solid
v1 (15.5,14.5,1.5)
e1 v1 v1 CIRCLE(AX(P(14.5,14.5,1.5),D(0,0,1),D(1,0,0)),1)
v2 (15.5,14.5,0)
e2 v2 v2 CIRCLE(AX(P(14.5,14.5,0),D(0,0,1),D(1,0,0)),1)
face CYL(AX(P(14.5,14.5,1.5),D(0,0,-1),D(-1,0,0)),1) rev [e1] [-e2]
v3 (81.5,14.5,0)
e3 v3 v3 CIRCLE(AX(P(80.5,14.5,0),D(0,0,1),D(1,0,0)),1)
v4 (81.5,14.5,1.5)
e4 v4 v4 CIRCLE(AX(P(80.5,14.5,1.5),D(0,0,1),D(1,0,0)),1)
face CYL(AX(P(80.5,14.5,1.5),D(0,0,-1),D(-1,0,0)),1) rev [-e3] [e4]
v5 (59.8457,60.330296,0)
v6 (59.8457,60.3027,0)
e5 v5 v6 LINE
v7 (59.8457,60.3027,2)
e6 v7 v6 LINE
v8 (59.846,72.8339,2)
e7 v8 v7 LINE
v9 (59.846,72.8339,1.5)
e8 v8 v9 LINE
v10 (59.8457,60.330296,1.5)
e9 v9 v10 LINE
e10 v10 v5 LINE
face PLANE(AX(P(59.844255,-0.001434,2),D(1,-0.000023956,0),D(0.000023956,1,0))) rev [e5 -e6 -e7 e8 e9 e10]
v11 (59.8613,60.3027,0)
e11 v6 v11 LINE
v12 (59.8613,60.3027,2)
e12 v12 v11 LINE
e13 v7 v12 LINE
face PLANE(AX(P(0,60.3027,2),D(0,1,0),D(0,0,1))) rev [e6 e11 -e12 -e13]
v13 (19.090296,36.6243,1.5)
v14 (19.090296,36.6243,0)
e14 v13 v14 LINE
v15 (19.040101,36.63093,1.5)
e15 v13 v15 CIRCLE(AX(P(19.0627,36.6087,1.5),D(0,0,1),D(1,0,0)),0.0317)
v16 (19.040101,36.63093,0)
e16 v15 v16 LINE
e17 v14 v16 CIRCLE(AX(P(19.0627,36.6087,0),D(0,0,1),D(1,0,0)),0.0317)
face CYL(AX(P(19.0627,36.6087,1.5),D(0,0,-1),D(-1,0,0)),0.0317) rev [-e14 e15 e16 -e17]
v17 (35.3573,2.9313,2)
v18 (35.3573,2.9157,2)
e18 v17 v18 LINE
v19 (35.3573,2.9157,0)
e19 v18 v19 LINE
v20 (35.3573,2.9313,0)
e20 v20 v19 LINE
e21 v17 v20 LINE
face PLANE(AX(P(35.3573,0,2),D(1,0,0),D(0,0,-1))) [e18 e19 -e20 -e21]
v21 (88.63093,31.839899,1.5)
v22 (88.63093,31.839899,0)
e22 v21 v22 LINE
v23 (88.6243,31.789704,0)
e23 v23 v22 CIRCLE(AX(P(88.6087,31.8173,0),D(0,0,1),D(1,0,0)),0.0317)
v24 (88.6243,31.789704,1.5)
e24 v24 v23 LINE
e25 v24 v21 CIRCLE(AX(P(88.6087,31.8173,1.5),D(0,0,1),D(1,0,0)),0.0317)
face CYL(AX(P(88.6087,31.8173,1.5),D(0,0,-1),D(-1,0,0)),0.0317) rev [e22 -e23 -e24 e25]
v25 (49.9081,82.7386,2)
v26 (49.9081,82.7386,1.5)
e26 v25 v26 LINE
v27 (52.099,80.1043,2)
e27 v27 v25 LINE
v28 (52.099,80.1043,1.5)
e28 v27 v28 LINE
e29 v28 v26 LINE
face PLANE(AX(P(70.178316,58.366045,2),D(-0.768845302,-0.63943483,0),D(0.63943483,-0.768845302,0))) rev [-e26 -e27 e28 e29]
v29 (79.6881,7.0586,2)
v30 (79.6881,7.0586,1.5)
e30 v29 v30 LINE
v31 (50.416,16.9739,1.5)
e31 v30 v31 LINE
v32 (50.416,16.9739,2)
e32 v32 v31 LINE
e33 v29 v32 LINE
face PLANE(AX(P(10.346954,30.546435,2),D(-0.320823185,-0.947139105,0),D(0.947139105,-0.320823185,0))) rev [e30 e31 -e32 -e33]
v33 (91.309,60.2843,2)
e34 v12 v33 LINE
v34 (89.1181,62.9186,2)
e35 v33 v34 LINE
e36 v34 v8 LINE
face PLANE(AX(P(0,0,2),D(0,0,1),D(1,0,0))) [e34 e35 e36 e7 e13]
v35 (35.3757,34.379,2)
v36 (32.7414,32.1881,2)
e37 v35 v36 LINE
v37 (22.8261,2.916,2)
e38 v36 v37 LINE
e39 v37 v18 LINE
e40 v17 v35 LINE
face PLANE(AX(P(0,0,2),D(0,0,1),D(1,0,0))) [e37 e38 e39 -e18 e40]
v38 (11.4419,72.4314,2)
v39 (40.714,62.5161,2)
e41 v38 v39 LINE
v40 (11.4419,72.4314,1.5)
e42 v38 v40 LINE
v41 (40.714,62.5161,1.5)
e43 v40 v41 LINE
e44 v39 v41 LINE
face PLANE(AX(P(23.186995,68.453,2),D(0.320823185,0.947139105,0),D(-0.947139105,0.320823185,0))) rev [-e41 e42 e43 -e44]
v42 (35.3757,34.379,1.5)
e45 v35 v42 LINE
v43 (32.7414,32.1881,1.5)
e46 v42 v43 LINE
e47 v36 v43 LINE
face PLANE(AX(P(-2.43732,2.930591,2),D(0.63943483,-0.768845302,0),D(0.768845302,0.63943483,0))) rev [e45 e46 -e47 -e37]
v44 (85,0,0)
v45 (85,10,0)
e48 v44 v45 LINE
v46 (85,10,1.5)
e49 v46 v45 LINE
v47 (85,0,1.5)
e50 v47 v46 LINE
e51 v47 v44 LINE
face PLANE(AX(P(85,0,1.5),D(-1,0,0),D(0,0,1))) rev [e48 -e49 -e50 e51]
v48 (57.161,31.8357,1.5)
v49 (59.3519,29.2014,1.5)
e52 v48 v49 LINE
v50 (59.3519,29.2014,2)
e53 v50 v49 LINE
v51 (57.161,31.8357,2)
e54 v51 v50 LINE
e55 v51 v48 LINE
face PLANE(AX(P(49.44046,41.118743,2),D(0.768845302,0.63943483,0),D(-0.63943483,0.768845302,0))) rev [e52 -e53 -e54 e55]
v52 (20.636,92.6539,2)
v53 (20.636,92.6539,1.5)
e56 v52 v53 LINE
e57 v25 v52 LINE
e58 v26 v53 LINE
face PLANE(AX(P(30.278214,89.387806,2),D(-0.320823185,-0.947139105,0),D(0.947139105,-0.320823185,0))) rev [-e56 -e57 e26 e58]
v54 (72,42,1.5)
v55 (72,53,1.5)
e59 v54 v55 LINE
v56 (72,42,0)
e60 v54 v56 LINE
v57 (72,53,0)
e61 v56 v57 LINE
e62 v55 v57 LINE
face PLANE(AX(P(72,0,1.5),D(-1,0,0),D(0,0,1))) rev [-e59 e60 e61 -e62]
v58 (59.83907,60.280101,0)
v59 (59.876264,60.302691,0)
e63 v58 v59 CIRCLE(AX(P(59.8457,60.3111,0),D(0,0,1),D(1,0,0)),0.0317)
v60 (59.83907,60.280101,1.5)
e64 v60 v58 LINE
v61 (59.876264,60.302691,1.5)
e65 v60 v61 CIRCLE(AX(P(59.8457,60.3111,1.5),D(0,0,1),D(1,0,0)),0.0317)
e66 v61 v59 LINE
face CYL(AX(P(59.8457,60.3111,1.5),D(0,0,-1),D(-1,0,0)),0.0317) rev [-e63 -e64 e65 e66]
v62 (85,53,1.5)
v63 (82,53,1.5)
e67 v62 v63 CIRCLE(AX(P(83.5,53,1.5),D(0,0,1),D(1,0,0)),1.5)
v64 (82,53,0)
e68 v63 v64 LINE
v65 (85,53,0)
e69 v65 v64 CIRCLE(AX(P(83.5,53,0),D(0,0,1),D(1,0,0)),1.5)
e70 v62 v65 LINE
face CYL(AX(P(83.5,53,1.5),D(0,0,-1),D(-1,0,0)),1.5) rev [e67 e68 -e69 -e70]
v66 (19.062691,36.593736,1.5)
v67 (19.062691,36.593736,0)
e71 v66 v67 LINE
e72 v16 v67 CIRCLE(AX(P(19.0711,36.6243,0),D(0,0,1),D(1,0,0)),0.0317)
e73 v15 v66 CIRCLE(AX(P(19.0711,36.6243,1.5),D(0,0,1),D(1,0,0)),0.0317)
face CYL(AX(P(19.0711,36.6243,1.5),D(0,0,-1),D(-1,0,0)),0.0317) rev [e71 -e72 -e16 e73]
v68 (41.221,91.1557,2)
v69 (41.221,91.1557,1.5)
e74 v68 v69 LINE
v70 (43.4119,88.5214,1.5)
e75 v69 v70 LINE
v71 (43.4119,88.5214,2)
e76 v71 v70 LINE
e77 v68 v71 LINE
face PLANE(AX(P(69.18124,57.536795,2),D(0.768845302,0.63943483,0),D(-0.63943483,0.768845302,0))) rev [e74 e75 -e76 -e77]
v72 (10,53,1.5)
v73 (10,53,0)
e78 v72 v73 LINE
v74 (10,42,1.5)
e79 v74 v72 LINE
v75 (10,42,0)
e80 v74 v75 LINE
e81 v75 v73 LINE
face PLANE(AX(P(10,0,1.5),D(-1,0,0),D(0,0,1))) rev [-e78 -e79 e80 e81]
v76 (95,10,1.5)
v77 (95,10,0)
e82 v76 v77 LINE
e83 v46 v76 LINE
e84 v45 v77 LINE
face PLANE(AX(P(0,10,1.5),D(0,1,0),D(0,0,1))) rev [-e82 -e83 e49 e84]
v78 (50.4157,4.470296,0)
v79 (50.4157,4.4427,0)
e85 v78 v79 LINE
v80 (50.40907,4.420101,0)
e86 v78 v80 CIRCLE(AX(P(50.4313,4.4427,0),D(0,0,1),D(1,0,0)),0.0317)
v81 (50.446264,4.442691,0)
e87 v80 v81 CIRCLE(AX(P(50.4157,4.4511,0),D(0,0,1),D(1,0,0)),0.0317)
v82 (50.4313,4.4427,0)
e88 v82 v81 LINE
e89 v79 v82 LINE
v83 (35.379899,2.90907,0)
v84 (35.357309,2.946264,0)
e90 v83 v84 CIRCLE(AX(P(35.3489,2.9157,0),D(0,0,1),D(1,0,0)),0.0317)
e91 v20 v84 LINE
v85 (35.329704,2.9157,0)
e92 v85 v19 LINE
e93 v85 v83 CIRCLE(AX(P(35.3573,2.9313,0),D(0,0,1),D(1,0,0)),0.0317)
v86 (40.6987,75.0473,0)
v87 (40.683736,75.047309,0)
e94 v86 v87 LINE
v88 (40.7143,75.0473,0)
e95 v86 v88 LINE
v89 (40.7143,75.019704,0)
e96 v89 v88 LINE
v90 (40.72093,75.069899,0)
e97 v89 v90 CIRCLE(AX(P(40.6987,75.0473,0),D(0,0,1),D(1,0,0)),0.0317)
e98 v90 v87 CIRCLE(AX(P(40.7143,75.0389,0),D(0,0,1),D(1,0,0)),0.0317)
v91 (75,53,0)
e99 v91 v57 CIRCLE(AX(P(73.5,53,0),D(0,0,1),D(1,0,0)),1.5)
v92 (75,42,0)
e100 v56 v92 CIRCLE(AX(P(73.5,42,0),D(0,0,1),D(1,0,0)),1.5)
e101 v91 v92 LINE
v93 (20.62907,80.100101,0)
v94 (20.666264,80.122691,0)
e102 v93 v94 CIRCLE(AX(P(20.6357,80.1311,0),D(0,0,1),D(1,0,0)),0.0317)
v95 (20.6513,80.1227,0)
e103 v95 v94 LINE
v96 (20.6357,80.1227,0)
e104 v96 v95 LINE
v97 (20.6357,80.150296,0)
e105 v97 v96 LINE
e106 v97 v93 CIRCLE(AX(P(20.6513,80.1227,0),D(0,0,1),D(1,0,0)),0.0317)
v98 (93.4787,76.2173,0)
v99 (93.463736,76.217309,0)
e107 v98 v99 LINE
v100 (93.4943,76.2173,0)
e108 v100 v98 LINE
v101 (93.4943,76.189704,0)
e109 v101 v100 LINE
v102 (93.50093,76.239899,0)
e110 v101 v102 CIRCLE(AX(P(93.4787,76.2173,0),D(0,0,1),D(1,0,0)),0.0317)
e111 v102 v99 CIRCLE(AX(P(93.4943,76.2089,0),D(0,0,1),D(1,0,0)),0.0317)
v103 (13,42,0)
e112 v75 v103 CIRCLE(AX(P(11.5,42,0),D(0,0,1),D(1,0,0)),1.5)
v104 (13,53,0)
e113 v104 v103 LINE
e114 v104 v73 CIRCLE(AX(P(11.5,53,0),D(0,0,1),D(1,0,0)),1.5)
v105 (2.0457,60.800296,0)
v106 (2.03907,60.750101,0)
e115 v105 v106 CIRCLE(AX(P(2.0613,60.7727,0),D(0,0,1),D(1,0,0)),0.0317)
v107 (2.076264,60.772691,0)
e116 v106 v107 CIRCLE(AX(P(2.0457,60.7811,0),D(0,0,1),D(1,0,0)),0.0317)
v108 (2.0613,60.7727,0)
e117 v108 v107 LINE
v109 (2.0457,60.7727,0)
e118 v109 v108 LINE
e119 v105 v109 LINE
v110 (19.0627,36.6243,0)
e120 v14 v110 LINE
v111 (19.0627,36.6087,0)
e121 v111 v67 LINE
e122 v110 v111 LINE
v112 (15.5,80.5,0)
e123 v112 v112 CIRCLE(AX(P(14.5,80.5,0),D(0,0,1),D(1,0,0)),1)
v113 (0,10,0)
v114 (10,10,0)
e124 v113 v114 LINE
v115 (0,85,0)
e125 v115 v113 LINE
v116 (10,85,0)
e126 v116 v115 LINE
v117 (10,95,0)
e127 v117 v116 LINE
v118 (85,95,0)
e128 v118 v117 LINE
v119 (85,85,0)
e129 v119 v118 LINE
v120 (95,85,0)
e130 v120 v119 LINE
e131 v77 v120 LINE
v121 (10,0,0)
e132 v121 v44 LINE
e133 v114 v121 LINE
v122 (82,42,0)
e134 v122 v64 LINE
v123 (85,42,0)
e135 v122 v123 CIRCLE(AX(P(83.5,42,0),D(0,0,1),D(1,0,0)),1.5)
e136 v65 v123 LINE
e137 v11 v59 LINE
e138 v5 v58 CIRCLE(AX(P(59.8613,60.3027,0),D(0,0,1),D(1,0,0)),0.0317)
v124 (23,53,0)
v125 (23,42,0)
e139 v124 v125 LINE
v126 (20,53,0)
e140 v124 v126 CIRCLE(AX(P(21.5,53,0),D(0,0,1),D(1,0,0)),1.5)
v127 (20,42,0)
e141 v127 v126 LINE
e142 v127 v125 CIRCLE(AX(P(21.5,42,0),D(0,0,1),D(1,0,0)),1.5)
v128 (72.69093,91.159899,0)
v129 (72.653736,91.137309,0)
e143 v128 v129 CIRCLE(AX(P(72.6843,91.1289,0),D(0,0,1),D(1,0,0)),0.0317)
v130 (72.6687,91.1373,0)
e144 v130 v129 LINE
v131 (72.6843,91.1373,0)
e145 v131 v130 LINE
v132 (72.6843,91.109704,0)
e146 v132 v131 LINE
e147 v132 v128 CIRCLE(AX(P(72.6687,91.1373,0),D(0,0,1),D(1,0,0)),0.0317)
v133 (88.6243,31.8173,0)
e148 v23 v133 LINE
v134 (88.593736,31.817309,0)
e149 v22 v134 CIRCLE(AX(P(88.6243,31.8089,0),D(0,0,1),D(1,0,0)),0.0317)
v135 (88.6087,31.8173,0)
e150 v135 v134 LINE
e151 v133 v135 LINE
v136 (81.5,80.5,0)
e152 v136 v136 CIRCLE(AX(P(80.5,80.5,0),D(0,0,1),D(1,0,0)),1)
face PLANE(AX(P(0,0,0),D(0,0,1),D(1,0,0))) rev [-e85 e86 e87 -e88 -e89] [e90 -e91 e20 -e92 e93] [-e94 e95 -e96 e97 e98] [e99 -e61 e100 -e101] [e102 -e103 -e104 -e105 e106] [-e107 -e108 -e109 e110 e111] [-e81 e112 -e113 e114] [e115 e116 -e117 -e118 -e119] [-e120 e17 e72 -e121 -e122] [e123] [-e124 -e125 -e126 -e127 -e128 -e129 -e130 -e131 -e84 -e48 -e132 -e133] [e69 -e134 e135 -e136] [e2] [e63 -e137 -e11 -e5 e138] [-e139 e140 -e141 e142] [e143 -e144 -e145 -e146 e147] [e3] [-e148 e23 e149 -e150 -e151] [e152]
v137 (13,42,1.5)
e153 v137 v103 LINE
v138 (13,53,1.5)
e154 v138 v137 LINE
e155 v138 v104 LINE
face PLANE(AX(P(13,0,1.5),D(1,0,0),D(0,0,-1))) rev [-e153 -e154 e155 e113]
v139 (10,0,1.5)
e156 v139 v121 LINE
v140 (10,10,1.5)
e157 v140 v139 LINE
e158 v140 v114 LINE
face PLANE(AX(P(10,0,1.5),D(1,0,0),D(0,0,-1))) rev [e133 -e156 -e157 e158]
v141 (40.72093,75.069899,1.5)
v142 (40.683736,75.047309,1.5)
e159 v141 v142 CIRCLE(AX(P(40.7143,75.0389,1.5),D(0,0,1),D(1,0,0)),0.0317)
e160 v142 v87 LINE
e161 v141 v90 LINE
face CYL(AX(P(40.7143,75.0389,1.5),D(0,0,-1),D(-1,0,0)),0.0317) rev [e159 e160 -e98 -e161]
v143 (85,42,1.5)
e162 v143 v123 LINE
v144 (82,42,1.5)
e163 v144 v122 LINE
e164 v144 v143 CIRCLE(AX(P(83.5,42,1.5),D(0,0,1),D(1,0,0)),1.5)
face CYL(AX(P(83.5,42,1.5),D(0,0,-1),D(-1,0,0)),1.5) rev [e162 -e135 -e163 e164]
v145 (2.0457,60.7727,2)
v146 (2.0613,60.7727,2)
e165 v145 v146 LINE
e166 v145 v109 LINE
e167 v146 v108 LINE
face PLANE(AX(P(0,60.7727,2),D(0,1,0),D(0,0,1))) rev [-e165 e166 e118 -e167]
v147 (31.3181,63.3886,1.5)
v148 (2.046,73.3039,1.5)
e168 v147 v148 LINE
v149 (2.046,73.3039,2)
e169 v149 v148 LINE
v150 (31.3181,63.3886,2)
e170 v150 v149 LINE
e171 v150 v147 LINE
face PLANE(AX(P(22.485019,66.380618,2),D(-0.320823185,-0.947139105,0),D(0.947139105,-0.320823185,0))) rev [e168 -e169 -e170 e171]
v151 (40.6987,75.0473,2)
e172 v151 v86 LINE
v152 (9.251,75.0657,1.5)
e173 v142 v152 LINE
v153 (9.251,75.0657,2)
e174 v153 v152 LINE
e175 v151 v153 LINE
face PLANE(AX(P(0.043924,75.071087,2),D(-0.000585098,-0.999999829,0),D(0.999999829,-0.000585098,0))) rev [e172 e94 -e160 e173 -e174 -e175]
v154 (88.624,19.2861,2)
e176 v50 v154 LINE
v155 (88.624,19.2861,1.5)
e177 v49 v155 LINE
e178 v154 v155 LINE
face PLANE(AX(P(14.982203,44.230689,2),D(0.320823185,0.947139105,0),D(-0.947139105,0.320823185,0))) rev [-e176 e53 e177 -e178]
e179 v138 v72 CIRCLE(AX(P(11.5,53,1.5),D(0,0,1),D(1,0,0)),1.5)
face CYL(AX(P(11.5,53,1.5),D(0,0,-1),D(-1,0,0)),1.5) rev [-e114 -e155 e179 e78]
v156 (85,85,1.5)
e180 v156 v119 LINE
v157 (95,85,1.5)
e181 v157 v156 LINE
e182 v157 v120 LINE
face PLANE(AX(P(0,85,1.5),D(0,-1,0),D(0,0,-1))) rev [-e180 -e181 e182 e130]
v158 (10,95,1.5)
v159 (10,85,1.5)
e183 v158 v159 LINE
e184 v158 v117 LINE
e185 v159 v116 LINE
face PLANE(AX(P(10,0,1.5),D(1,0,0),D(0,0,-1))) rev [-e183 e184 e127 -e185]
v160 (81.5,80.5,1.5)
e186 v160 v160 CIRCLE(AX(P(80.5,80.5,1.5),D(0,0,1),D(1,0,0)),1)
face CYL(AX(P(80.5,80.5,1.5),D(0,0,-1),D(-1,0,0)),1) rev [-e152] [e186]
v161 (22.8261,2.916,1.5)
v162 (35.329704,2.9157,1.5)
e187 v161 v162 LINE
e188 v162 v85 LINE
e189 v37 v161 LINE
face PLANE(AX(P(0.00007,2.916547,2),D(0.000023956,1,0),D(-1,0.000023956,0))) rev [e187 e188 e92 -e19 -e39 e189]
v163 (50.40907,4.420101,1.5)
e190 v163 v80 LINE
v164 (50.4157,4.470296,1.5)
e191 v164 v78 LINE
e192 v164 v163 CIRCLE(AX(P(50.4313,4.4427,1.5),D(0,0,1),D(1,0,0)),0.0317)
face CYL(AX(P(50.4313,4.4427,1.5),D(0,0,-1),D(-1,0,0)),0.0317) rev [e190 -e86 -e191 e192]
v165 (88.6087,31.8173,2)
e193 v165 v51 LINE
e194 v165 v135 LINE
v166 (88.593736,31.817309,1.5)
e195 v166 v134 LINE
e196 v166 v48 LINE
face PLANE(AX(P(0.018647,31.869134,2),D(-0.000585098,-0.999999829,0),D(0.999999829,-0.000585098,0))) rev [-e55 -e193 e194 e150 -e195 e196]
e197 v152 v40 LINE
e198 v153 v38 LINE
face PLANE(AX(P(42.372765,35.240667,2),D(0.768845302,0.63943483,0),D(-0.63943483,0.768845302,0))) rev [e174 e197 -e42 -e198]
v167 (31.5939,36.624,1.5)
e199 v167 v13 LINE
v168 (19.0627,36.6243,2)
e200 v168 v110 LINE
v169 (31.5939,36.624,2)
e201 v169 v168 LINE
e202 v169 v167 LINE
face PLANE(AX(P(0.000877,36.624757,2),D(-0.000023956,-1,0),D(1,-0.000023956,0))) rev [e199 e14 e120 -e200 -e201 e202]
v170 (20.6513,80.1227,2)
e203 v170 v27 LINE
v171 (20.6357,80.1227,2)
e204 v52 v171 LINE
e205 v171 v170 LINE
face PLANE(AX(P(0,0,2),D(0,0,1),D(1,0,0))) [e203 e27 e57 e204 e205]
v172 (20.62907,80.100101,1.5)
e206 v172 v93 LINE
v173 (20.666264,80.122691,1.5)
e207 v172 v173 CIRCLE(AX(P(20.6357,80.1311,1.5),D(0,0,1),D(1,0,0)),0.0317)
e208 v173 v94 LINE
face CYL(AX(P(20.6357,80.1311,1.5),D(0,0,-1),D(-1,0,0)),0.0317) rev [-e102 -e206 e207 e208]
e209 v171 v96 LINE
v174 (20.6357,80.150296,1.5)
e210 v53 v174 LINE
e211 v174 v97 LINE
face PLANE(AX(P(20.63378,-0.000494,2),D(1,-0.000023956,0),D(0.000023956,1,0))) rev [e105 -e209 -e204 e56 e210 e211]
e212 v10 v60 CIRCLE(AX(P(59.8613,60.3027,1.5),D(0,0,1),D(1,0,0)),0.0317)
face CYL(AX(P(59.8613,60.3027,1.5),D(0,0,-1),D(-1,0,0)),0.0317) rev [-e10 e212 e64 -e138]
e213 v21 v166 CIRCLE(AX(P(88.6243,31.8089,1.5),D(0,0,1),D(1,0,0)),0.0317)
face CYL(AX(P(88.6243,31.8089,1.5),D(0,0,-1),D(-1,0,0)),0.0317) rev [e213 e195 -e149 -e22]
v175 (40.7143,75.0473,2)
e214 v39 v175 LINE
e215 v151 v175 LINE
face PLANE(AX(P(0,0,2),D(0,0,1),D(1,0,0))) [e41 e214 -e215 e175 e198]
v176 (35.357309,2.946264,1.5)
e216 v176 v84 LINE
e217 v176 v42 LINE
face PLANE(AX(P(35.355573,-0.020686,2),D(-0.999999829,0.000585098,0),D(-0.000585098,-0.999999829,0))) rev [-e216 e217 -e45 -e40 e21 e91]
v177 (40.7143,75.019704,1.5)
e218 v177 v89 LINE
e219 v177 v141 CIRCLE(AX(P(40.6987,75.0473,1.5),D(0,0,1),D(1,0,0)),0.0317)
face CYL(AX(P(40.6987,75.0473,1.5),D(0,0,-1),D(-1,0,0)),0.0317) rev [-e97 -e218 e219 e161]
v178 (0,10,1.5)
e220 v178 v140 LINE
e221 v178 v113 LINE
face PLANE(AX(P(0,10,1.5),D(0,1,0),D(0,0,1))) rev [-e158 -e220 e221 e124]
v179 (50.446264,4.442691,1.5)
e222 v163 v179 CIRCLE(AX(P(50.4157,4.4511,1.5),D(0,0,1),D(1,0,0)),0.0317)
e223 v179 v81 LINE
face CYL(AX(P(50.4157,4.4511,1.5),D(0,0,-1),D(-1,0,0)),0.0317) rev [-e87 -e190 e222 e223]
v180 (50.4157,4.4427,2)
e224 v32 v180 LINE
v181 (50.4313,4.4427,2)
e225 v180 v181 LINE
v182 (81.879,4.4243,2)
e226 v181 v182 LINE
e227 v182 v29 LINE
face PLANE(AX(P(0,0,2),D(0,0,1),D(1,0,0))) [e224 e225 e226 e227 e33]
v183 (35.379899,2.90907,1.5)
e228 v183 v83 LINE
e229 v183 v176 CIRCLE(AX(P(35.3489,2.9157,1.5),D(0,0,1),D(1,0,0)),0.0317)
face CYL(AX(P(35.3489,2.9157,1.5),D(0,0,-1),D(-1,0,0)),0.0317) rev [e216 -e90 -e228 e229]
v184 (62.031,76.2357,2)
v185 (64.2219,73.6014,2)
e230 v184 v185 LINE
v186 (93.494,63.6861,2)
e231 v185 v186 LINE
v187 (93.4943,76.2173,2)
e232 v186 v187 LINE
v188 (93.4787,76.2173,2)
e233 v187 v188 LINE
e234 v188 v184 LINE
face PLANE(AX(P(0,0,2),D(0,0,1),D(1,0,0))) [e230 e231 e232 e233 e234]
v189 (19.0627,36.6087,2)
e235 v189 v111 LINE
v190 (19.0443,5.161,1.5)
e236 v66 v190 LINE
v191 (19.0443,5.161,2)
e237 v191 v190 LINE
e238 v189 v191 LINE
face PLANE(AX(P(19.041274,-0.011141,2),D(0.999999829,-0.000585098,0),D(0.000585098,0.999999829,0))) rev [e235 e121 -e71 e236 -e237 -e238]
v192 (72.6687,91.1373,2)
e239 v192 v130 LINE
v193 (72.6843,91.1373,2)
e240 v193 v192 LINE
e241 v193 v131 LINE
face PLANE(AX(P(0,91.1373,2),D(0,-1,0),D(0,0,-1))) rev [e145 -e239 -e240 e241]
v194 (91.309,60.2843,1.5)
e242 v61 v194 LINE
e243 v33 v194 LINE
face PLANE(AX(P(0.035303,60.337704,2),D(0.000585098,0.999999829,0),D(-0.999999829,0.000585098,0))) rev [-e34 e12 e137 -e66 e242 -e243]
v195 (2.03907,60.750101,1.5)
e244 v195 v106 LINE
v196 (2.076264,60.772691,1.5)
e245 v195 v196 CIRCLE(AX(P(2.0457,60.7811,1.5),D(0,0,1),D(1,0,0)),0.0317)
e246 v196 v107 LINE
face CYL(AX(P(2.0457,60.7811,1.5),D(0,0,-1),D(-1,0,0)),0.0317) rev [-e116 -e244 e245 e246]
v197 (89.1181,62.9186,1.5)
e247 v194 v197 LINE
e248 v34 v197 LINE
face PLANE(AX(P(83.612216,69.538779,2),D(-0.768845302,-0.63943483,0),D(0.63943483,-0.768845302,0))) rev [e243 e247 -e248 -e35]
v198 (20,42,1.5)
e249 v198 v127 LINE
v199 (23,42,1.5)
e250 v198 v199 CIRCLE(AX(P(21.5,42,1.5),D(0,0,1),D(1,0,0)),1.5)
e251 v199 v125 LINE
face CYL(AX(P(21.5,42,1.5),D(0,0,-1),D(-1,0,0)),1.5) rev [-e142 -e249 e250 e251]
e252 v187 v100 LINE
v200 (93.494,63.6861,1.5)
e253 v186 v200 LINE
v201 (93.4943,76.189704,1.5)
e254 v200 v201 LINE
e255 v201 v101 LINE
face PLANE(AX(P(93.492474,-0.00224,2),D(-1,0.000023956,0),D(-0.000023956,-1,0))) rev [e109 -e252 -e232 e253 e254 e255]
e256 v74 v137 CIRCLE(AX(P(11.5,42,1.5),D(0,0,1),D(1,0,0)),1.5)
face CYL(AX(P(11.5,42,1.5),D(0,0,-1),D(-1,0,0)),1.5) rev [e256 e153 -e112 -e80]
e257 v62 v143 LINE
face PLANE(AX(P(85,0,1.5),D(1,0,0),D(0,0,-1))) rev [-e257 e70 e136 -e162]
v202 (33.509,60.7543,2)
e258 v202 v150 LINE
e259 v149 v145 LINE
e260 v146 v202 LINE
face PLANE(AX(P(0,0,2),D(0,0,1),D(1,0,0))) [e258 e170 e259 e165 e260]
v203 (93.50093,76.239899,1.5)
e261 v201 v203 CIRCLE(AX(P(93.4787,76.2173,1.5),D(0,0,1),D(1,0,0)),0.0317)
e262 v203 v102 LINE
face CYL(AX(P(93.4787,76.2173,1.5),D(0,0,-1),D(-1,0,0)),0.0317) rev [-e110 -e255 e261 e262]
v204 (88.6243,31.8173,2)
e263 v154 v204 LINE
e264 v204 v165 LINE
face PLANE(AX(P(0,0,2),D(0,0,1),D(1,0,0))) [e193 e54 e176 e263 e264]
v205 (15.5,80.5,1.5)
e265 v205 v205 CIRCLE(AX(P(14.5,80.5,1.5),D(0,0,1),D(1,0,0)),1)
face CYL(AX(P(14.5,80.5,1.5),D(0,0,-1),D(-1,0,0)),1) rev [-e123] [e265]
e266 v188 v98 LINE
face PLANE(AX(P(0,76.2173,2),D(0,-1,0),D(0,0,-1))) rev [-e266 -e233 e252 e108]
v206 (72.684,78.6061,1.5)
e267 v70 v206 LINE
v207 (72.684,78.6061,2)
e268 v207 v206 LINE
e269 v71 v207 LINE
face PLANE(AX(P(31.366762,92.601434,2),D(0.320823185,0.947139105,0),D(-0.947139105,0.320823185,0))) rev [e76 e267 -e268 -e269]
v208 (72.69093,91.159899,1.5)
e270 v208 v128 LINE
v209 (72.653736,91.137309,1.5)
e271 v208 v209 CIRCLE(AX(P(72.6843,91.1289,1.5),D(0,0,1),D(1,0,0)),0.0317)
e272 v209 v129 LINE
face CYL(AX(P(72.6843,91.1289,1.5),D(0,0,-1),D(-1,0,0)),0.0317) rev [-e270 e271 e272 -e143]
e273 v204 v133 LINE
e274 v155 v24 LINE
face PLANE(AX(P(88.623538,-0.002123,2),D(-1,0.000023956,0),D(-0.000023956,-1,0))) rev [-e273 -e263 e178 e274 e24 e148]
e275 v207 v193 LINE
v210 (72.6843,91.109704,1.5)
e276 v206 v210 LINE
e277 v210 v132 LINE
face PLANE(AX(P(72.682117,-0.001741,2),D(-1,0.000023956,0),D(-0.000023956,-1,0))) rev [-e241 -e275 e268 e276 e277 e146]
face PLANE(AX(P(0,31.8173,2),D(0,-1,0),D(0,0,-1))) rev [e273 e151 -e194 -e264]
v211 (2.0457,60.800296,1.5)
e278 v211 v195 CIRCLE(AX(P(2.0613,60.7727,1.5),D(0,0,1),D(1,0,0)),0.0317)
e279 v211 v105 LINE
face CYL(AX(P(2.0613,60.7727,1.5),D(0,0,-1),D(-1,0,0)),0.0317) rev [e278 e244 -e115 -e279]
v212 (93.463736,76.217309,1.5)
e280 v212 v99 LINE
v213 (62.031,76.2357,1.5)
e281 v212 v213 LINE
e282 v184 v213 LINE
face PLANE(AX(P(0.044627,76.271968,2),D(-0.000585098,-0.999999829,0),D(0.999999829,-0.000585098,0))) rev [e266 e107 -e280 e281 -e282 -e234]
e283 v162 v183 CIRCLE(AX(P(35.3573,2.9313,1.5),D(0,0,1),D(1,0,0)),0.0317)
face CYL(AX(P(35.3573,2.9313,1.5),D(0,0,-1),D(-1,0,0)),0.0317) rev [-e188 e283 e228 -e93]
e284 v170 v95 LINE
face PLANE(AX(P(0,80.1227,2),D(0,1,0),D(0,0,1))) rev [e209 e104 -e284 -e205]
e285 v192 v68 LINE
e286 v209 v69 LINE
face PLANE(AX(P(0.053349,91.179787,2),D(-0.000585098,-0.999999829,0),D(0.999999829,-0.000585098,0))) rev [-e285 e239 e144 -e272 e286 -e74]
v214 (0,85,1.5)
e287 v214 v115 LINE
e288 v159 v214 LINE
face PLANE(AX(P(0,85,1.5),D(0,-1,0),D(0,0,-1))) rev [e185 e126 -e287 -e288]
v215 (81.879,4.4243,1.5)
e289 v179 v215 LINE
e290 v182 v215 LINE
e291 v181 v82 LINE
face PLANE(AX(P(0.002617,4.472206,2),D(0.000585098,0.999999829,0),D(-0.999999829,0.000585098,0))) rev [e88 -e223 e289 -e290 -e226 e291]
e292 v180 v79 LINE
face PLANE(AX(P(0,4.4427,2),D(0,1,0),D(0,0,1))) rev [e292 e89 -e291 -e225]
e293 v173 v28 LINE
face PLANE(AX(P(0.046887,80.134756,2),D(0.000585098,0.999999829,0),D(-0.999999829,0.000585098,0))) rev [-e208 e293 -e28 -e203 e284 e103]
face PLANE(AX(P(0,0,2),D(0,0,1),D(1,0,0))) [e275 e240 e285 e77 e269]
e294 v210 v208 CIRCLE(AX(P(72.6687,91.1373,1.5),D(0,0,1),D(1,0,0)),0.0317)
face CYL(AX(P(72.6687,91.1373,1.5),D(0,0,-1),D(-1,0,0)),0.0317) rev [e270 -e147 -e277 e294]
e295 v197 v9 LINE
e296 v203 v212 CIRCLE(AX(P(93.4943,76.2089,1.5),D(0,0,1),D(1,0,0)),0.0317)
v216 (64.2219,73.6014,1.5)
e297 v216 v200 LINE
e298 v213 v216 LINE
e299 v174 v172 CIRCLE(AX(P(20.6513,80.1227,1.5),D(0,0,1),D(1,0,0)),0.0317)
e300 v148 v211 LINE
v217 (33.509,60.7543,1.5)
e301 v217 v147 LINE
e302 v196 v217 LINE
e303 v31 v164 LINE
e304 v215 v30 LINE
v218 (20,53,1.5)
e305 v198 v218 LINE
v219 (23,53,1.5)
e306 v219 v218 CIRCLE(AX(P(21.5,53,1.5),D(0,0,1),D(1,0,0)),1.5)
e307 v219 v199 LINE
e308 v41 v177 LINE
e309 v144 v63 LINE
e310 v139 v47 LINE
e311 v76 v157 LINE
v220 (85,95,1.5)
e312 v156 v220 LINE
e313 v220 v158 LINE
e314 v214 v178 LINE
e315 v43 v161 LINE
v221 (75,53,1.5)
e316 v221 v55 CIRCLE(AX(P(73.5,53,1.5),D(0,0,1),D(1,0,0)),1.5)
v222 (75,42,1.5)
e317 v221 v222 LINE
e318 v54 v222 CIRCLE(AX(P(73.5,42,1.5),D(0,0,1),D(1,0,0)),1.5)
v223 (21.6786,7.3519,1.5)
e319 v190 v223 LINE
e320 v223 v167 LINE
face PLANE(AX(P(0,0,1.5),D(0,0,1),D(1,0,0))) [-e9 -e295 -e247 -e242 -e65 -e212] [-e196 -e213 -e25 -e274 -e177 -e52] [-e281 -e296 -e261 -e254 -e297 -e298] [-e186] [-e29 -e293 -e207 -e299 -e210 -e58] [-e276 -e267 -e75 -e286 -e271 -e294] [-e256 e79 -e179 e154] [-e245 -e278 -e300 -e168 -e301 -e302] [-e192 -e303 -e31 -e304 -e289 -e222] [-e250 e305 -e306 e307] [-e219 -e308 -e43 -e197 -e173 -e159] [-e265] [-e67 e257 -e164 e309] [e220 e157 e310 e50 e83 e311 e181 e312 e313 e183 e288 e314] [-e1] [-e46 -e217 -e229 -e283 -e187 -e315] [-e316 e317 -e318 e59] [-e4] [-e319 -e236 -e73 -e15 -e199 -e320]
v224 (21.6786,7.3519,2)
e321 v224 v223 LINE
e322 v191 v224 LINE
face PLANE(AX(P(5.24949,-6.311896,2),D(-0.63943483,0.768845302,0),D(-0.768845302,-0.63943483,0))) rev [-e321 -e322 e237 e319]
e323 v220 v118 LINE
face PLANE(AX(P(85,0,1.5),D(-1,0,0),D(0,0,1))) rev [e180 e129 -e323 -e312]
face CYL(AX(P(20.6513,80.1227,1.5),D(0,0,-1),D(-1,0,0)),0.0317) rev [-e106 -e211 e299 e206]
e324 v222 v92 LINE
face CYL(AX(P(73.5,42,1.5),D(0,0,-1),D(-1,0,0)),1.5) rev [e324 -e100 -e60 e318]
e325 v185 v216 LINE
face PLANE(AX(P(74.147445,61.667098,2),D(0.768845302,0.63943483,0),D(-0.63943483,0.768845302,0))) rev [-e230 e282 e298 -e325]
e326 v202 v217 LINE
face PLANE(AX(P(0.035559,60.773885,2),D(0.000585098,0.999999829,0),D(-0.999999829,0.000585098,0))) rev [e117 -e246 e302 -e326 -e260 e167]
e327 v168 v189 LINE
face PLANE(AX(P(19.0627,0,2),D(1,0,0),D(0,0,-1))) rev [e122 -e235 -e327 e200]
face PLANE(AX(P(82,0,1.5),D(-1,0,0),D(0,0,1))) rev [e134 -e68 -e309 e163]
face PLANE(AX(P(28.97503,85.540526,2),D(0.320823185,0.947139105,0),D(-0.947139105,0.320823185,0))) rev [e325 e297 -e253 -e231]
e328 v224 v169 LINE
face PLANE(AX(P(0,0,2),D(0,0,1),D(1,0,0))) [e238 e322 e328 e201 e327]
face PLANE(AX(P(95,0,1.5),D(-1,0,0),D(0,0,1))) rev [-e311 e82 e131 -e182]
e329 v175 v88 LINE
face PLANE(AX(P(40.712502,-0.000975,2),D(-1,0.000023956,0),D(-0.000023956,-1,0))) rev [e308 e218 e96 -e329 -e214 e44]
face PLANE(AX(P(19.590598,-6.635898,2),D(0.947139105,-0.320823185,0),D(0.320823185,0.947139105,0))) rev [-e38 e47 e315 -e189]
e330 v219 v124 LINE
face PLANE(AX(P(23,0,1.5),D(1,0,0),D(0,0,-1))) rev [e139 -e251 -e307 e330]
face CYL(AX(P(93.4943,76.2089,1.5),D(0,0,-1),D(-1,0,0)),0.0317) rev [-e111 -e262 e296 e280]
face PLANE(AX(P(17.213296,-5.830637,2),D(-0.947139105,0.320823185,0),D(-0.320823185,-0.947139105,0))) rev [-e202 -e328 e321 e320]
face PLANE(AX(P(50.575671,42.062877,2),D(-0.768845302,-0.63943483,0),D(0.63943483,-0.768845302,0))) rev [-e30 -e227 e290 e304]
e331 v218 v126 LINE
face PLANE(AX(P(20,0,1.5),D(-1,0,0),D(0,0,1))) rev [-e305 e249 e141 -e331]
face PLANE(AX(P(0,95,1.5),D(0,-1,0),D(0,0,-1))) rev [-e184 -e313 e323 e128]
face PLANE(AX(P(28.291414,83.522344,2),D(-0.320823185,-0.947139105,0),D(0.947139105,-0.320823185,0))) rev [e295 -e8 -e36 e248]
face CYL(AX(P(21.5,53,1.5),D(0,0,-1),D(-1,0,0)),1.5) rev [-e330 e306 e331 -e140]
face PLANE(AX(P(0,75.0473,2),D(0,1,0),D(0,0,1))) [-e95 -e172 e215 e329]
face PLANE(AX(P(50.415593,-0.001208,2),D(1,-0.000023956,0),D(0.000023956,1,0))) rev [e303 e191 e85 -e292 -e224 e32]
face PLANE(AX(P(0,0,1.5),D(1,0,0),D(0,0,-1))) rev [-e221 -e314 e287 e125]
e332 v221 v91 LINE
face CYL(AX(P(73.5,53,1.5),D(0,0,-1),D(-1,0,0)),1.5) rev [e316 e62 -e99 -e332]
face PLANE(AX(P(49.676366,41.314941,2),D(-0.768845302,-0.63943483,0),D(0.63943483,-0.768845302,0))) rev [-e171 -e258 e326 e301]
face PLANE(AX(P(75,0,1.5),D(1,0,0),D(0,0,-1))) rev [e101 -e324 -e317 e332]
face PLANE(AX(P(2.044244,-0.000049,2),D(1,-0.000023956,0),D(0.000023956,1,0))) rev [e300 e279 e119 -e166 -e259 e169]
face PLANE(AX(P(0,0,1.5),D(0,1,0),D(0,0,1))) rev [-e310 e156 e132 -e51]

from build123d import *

# Parameters (mm, degrees)
BOSS_EXTRUDE3_DEPTH     = 2
BOSS_EXTRUDE3_2_DEPTH   = 2
BOSS_EXTRUDE3_3_DEPTH   = 2
BOSS_EXTRUDE3_4_DEPTH   = 2
BOSS_EXTRUDE3_5_DEPTH   = 2
BOSS_EXTRUDE3_6_DEPTH   = 2
BOSS_EXTRUDE3_7_DEPTH   = 2
BOSS_EXTRUDE3_8_DEPTH   = 2
BOSS_EXTRUDE3_9_DEPTH   = 2
BOSS_EXTRUDE3_10_DEPTH  = 2
BOSS_EXTRUDE4_OUTLINE_R = 1
BOSS_EXTRUDE4_DEPTH     = 1.5


# Read off the part's stored shape, not the designer's step: Boss-Extrude4
with BuildPart() as part:
    # Model → Boss-Extrude3 (new body)
    with BuildSketch(Plane.XY):
        Polygon((59.84570046, 60.330296093), (59.8457, 60.3111), (59.8457, 60.3027), (59.8613, 60.3027), (59.876264405, 60.302691244), (91.309, 60.2843), (89.13842206, 62.894165109), (89.1181, 62.9186), (89.088037471, 62.928783041), (59.846, 72.8339), align=None)
    extrude(amount=BOSS_EXTRUDE3_DEPTH)



with BuildPart() as body_2:
    # Model → Boss-Extrude3 2 (new body)
    with BuildSketch(Plane.XY):
        Polygon((93.49429954, 76.189703907), (93.4943, 76.2089), (93.4943, 76.2173), (93.4787, 76.2173), (93.463735595, 76.217308756), (62.031, 76.2357), (64.20157794, 73.625834891), (64.2219, 73.6014), (64.251962529, 73.591216959), (93.494, 63.6861), align=None)
    extrude(amount=BOSS_EXTRUDE3_2_DEPTH)


with BuildPart() as body_3:
    # Model → Boss-Extrude3 3 (new body)
    with BuildSketch(Plane.XY):
        Polygon((72.68429954, 91.109703907), (72.6843, 91.1289), (72.6843, 91.1373), (72.6687, 91.1373), (72.653735595, 91.137308756), (41.221, 91.1557), (43.39157794, 88.545834891), (43.4119, 88.5214), (43.441962529, 88.511216959), (72.684, 78.6061), align=None)
    extrude(amount=BOSS_EXTRUDE3_3_DEPTH)


with BuildPart() as body_4:
    # Model → Boss-Extrude3 4 (new body)
    with BuildSketch(Plane.XY):
        Polygon((20.63570046, 80.150296093), (20.6357, 80.1311), (20.6357, 80.1227), (20.6513, 80.1227), (20.666264405, 80.122691244), (52.099, 80.1043), (49.92842206, 82.714165109), (49.9081, 82.7386), (49.878037471, 82.748783041), (20.636, 92.6539), align=None)
    extrude(amount=BOSS_EXTRUDE3_4_DEPTH)


with BuildPart() as body_5:
    # Model → Boss-Extrude3 5 (new body)
    with BuildSketch(Plane.XY):
        Polygon((40.7143, 75.0473), (40.6987, 75.0473), (40.683735595, 75.047308756), (9.251, 75.0657), (11.42157794, 72.455834891), (11.4419, 72.4314), (11.471962529, 72.421216959), (40.714, 62.5161), (40.71429954, 75.019703907), (40.7143, 75.0389), align=None)
    extrude(amount=BOSS_EXTRUDE3_5_DEPTH)


with BuildPart() as body_6:
    # Model → Boss-Extrude3 6 (new body)
    with BuildSketch(Plane.XY):
        Polygon((2.04570046, 60.800296093), (2.0457, 60.7811), (2.0457, 60.7727), (2.0613, 60.7727), (2.076264405, 60.772691244), (33.509, 60.7543), (31.33842206, 63.364165109), (31.3181, 63.3886), (31.288037471, 63.398783041), (2.046, 73.3039), align=None)
    extrude(amount=BOSS_EXTRUDE3_6_DEPTH)


with BuildPart() as body_7:
    # Model → Boss-Extrude3 7 (new body)
    with BuildSketch(Plane.XY):
        Polygon((19.090296093, 36.62429954), (19.0711, 36.6243), (19.0627, 36.6243), (19.0627, 36.6087), (19.062691244, 36.593735595), (19.0443, 5.161), (21.654165109, 7.33157794), (21.6786, 7.3519), (21.688783041, 7.381962529), (31.5939, 36.624), align=None)
    extrude(amount=BOSS_EXTRUDE3_7_DEPTH)


with BuildPart() as body_8:
    # Model → Boss-Extrude3 8 (new body)
    with BuildSketch(Plane.XY):
        Polygon((35.3573, 2.9157), (35.3573, 2.9313), (35.357308756, 2.946264405), (35.3757, 34.379), (32.765834891, 32.20842206), (32.7414, 32.1881), (32.731216959, 32.158037471), (22.8261, 2.916), (35.329703907, 2.91570046), (35.3489, 2.9157), align=None)
    extrude(amount=BOSS_EXTRUDE3_8_DEPTH)


with BuildPart() as body_9:
    # Model → Boss-Extrude3 9 (new body)
    with BuildSketch(Plane.XY):
        Polygon((50.41570046, 4.470296093), (50.4157, 4.4511), (50.4157, 4.4427), (50.4313, 4.4427), (50.446264405, 4.442691244), (81.879, 4.4243), (79.70842206, 7.034165109), (79.6881, 7.0586), (79.658037471, 7.068783041), (50.416, 16.9739), align=None)
    extrude(amount=BOSS_EXTRUDE3_9_DEPTH)


with BuildPart() as body_10:
    # Model → Boss-Extrude3 10 (new body)
    with BuildSketch(Plane.XY):
        Polygon((88.62429954, 31.789703907), (88.6243, 31.8089), (88.6243, 31.8173), (88.6087, 31.8173), (88.593735595, 31.817308756), (57.161, 31.8357), (59.33157794, 29.225834891), (59.3519, 29.2014), (59.381962529, 29.191216959), (88.624, 19.2861), align=None)
    extrude(amount=BOSS_EXTRUDE3_10_DEPTH)


with BuildPart() as part_1:
    add(part.part)

    add(body_2.part)  # Boss-Extrude4 merges body 2

    add(body_3.part)  # Boss-Extrude4 merges body 3

    add(body_4.part)  # Boss-Extrude4 merges body 4

    add(body_5.part)  # Boss-Extrude4 merges body 5

    add(body_6.part)  # Boss-Extrude4 merges body 6

    add(body_7.part)  # Boss-Extrude4 merges body 7

    add(body_8.part)  # Boss-Extrude4 merges body 8

    add(body_9.part)  # Boss-Extrude4 merges body 9

    add(body_10.part)  # Boss-Extrude4 merges body 10
    # Boss-Extrude4 outline → Boss-Extrude4 (add)
    with BuildSketch(Plane.XY):
        Polygon((10, 85), (0, 85), (0, 10), (10, 10), (10, 0), (85, 0), (85, 10), (95, 10), (95, 85), (85, 85), (85, 95), (10, 95), align=None)
        with Locations((14.5, 14.5)):
            Circle(BOSS_EXTRUDE4_OUTLINE_R, mode=Mode.SUBTRACT)
        with BuildLine():
            Line((35.3757, 34.379), (35.357308756, 2.946264405))
            ThreePointArc((35.357308756, 2.946264405), (35.375994273, 2.93215571), (35.379898885, 2.909069831))
            ThreePointArc((35.379898885, 2.909069831), (35.353148575, 2.899873011), (35.329703907, 2.91570046))
            Line((35.329703907, 2.91570046), (22.8261, 2.916))
            Line((22.8261, 2.916), (32.7414, 32.1881))
            Line((32.7414, 32.1881), (35.3757, 34.379))
        make_face(mode=Mode.SUBTRACT)
        with BuildLine():
            Line((19.0443, 5.161), (19.062691244, 36.593735595))
            ThreePointArc((19.062691244, 36.593735595), (19.044005727, 36.60784429), (19.040101115, 36.630930169))
            ThreePointArc((19.040101115, 36.630930169), (19.066851425, 36.640126989), (19.090296093, 36.62429954))
            Line((19.090296093, 36.62429954), (31.5939, 36.624))
            Line((31.5939, 36.624), (21.6786, 7.3519))
            Line((21.6786, 7.3519), (19.0443, 5.161))
        make_face(mode=Mode.SUBTRACT)
        with BuildLine():
            Line((81.879, 4.4243), (50.446264405, 4.442691244))
            ThreePointArc((50.446264405, 4.442691244), (50.43215571, 4.424005727), (50.409069831, 4.420101115))
            ThreePointArc((50.409069831, 4.420101115), (50.399873011, 4.446851425), (50.41570046, 4.470296093))
            Line((50.41570046, 4.470296093), (50.416, 16.9739))
            Line((50.416, 16.9739), (79.6881, 7.0586))
            Line((79.6881, 7.0586), (81.879, 4.4243))
        make_face(mode=Mode.SUBTRACT)
        with Locations((80.5, 14.5)):
            Circle(BOSS_EXTRUDE4_OUTLINE_R, mode=Mode.SUBTRACT)
        with BuildLine():
            Line((57.161, 31.8357), (88.593735595, 31.817308756))
            ThreePointArc((88.593735595, 31.817308756), (88.60784429, 31.835994273), (88.630930169, 31.839898885))
            ThreePointArc((88.630930169, 31.839898885), (88.640126989, 31.813148575), (88.62429954, 31.789703907))
            Line((88.62429954, 31.789703907), (88.624, 19.2861))
            Line((88.624, 19.2861), (59.3519, 29.2014))
            Line((59.3519, 29.2014), (57.161, 31.8357))
        make_face(mode=Mode.SUBTRACT)
        with BuildLine():
            Line((10, 42), (10, 53))
            ThreePointArc((10, 53), (11.5, 54.5), (13, 53))
            Line((13, 53), (13, 42))
            ThreePointArc((13, 42), (11.5, 40.5), (10, 42))
        make_face(mode=Mode.SUBTRACT)
        with BuildLine():
            Line((20, 42), (20, 53))
            ThreePointArc((20, 53), (21.5, 54.5), (23, 53))
            Line((23, 53), (23, 42))
            ThreePointArc((23, 42), (21.5, 40.5), (20, 42))
        make_face(mode=Mode.SUBTRACT)
        with BuildLine():
            Line((33.509, 60.7543), (2.076264405, 60.772691244))
            ThreePointArc((2.076264405, 60.772691244), (2.06215571, 60.754005727), (2.039069831, 60.750101115))
            ThreePointArc((2.039069831, 60.750101115), (2.029873011, 60.776851425), (2.04570046, 60.800296093))
            Line((2.04570046, 60.800296093), (2.046, 73.3039))
            Line((2.046, 73.3039), (31.3181, 63.3886))
            Line((31.3181, 63.3886), (33.509, 60.7543))
        make_face(mode=Mode.SUBTRACT)
        with BuildLine():
            Line((9.251, 75.0657), (40.683735595, 75.047308756))
            ThreePointArc((40.683735595, 75.047308756), (40.69784429, 75.065994273), (40.720930169, 75.069898885))
            ThreePointArc((40.720930169, 75.069898885), (40.730126989, 75.043148575), (40.71429954, 75.019703907))
            Line((40.71429954, 75.019703907), (40.714, 62.5161))
            Line((40.714, 62.5161), (11.4419, 72.4314))
            Line((11.4419, 72.4314), (9.251, 75.0657))
        make_face(mode=Mode.SUBTRACT)
        with Locations((14.5, 80.5)):
            Circle(BOSS_EXTRUDE4_OUTLINE_R, mode=Mode.SUBTRACT)
        with BuildLine():
            Line((52.099, 80.1043), (20.666264405, 80.122691244))
            ThreePointArc((20.666264405, 80.122691244), (20.65215571, 80.104005727), (20.629069831, 80.100101115))
            ThreePointArc((20.629069831, 80.100101115), (20.619873011, 80.126851425), (20.63570046, 80.150296093))
            Line((20.63570046, 80.150296093), (20.636, 92.6539))
            Line((20.636, 92.6539), (49.9081, 82.7386))
            Line((49.9081, 82.7386), (52.099, 80.1043))
        make_face(mode=Mode.SUBTRACT)
        with BuildLine():
            Line((72, 42), (72, 53))
            ThreePointArc((72, 53), (73.5, 54.5), (75, 53))
            Line((75, 53), (75, 42))
            ThreePointArc((75, 42), (73.5, 40.5), (72, 42))
        make_face(mode=Mode.SUBTRACT)
        with BuildLine():
            Line((82, 42), (82, 53))
            ThreePointArc((82, 53), (83.5, 54.5), (85, 53))
            Line((85, 53), (85, 42))
            ThreePointArc((85, 42), (83.5, 40.5), (82, 42))
        make_face(mode=Mode.SUBTRACT)
        with BuildLine():
            Line((91.309, 60.2843), (59.876264405, 60.302691244))
            ThreePointArc((59.876264405, 60.302691244), (59.86215571, 60.284005727), (59.839069831, 60.280101115))
            ThreePointArc((59.839069831, 60.280101115), (59.829873011, 60.306851425), (59.84570046, 60.330296093))
            Line((59.84570046, 60.330296093), (59.846, 72.8339))
            Line((59.846, 72.8339), (89.1181, 62.9186))
            Line((89.1181, 62.9186), (91.309, 60.2843))
        make_face(mode=Mode.SUBTRACT)
        with BuildLine():
            Line((62.031, 76.2357), (93.463735595, 76.217308756))
            ThreePointArc((93.463735595, 76.217308756), (93.47784429, 76.235994273), (93.500930169, 76.239898885))
            ThreePointArc((93.500930169, 76.239898885), (93.510126989, 76.213148575), (93.49429954, 76.189703907))
            Line((93.49429954, 76.189703907), (93.494, 63.6861))
            Line((93.494, 63.6861), (64.2219, 73.6014))
            Line((64.2219, 73.6014), (62.031, 76.2357))
        make_face(mode=Mode.SUBTRACT)
        with BuildLine():
            Line((41.221, 91.1557), (72.653735595, 91.137308756))
            ThreePointArc((72.653735595, 91.137308756), (72.66784429, 91.155994273), (72.690930169, 91.159898885))
            ThreePointArc((72.690930169, 91.159898885), (72.700126989, 91.133148575), (72.68429954, 91.109703907))
            Line((72.68429954, 91.109703907), (72.684, 78.6061))
            Line((72.684, 78.6061), (43.4119, 88.5214))
            Line((43.4119, 88.5214), (41.221, 91.1557))
        make_face(mode=Mode.SUBTRACT)
        with Locations((80.5, 80.5)):
            Circle(BOSS_EXTRUDE4_OUTLINE_R, mode=Mode.SUBTRACT)
    extrude(amount=BOSS_EXTRUDE4_DEPTH)


solid = part_1.part
